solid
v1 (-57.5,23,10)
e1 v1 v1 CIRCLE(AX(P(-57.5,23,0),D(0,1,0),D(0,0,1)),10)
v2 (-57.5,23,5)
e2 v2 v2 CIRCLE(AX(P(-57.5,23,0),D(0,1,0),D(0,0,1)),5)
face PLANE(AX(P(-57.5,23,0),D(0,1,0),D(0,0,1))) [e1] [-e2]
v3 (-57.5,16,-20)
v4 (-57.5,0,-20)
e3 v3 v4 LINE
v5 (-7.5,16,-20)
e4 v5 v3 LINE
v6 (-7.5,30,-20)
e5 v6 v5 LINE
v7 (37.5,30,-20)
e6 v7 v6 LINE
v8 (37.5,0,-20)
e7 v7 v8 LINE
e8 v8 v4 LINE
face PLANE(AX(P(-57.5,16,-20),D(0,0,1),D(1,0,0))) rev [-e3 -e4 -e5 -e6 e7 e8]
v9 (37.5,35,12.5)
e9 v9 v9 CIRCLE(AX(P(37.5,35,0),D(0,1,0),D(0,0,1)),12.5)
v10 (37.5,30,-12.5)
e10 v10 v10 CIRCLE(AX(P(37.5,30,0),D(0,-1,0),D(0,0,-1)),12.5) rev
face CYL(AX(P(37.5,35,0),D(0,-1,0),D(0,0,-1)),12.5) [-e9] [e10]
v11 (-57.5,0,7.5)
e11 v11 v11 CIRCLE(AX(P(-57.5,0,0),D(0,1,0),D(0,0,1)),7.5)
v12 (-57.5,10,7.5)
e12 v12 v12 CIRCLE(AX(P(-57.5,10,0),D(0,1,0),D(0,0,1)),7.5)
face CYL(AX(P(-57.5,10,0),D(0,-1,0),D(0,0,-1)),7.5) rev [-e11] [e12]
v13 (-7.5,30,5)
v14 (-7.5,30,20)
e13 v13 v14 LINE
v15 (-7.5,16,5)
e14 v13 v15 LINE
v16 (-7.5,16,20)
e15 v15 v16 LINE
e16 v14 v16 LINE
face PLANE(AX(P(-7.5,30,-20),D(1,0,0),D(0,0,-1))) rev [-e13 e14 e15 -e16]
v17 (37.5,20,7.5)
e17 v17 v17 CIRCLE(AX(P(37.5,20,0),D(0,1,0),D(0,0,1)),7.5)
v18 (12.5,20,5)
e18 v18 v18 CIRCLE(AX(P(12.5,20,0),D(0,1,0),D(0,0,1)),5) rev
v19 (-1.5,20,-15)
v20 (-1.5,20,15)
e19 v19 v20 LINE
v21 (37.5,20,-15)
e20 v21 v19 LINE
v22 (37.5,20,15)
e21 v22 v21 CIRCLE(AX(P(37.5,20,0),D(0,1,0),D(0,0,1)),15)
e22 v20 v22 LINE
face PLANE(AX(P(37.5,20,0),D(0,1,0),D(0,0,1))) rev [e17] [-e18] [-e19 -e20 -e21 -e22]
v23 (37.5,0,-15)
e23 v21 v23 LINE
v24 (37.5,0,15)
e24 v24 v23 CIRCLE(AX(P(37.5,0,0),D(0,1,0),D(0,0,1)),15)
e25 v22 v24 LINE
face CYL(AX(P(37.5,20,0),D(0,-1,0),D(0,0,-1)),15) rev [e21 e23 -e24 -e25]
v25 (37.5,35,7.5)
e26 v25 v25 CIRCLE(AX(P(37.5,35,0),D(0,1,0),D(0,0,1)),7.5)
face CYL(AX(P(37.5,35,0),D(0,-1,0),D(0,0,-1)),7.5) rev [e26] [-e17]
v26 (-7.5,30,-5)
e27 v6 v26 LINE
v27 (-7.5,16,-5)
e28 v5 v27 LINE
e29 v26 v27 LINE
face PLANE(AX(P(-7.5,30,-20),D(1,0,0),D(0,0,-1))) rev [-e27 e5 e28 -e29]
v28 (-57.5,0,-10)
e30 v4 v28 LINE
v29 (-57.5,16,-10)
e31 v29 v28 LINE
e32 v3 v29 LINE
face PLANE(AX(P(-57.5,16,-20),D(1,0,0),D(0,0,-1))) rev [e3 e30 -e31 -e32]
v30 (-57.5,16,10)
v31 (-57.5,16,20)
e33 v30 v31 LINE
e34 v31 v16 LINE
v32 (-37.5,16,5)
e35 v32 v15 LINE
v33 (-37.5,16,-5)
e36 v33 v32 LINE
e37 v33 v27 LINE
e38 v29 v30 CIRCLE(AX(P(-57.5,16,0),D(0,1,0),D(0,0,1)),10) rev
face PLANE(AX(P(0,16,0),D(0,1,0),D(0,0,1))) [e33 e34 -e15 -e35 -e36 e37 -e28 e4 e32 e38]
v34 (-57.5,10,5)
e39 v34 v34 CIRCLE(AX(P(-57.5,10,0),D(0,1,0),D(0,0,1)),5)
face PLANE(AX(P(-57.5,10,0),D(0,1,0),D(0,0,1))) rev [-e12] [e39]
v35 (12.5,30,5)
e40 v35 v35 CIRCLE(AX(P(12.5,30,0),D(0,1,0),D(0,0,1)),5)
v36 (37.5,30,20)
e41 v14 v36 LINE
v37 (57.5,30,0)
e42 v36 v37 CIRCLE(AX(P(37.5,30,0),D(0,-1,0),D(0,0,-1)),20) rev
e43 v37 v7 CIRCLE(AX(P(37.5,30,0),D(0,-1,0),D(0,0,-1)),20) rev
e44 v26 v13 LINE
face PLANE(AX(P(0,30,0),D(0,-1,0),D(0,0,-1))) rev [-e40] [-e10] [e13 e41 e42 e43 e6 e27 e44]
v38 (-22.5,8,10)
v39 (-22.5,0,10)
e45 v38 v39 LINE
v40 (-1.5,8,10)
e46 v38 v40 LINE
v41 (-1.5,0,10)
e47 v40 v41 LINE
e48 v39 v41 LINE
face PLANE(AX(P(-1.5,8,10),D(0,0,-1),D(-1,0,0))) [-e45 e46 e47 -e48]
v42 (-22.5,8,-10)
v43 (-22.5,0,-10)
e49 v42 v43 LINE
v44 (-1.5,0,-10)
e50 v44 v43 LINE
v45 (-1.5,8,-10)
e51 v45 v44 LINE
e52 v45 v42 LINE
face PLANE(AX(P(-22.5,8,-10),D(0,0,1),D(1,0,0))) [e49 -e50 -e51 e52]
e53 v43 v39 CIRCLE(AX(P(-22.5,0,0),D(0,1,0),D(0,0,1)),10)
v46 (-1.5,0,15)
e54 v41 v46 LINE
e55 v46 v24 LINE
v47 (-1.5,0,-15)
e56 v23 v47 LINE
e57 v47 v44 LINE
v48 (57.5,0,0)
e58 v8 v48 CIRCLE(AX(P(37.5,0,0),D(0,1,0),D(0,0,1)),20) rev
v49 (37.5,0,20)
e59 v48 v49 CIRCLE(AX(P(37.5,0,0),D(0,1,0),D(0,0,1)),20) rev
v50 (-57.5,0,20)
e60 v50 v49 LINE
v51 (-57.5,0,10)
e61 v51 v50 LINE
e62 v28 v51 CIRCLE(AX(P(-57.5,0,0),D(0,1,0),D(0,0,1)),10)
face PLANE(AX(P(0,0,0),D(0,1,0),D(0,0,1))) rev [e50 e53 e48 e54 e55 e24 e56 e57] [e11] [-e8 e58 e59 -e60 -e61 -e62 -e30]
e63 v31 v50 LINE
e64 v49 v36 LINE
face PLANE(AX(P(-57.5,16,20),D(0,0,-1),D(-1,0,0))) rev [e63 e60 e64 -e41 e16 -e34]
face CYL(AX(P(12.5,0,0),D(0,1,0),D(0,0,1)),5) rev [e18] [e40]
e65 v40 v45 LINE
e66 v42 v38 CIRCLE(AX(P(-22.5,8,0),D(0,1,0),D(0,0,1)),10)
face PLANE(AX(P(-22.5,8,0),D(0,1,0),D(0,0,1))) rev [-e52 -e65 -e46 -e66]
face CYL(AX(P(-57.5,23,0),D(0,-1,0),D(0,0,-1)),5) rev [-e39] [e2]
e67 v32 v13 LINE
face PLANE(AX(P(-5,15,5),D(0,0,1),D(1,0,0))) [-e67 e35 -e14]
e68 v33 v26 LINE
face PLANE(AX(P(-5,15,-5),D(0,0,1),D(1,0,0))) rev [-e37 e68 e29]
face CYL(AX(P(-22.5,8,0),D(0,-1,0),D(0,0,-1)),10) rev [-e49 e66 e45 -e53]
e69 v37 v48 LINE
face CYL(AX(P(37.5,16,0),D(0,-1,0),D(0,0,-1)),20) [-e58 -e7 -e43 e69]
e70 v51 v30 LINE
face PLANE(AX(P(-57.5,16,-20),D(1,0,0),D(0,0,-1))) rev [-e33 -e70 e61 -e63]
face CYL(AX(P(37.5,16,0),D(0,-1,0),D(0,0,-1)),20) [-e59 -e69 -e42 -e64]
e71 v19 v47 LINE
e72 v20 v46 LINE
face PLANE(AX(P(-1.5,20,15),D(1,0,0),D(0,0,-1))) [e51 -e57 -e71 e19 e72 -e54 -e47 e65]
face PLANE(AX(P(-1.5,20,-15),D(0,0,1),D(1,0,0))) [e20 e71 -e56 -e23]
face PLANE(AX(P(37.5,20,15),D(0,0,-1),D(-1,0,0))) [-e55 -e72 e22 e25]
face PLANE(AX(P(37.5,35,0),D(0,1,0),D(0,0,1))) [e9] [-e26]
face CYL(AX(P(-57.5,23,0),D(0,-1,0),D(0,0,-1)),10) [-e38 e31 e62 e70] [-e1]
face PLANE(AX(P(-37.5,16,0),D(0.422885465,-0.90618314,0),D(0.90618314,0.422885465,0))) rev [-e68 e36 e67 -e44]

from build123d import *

# Parameters (mm, degrees)
SKETCH1_W               = 115
SKETCH1_H               = 40
BOSS_EXTRUDE1_DEPTH     = 16
SKETCH2_R               = 10
SKETCH2_R_2             = 5
BOSS_EXTRUDE2_DEPTH     = 23
SKETCH3_R               = 7.5
CUT_EXTRUDE1_DEPTH      = 10
CUT_EXTRUDE2_DEPTH      = 36
CUT_EXTRUDE2_DEPTH_BACK = 24
SKETCH4_R               = 5
SKETCH5_W               = 65
SKETCH5_H               = 40
BOSS_EXTRUDE3_DEPTH     = 14
RIB2_REACH              = 78.526
SKETCH8_WALL_W          = 188.158169364
SKETCH8_WALL_H          = 10
FILLET3_R               = 20
SKETCH10_R              = 12.5
SKETCH10_R_2            = 7.5
BOSS_EXTRUDE4_DEPTH     = 5
SKETCH11_R              = 7.5
CUT_EXTRUDE3_DEPTH      = 77.526139325
SKETCH12_R              = 5
CUT_EXTRUDE4_DEPTH      = 77.526139325
CUT_EXTRUDE5_DEPTH      = 20
CUT_EXTRUDE6_DEPTH      = 8


with BuildPart() as part:
    # Sketch1 → Boss-Extrude1 (new body)
    with BuildSketch(Plane(origin=(0, 0, 0), x_dir=(1, 0, 0), z_dir=(0, 1, 0))):
        Rectangle(SKETCH1_W, SKETCH1_H)
    extrude(amount=BOSS_EXTRUDE1_DEPTH)

    # Sketch2 → Boss-Extrude2 (add)
    with BuildSketch(Plane(origin=(0, 0, 0), x_dir=(1, 0, 0), z_dir=(0, 1, 0))):
        with Locations(Location((-57.5, 0, 0), (0, 0, 270))):
            Circle(SKETCH2_R)
        with Locations(Location((-57.5, 0, 0), (0, 0, 270))):
            Circle(SKETCH2_R_2, mode=Mode.SUBTRACT)
    extrude(amount=BOSS_EXTRUDE2_DEPTH)

    # Sketch3 → Cut-Extrude1 (cut)
    with BuildSketch(Plane(origin=(0, 0, 0), x_dir=(1, 0, 0), z_dir=(0, 1, 0))):
        with Locations(Location((-57.5, 0, 0), (0, 0, 270))):
            Circle(SKETCH3_R)
    extrude(amount=CUT_EXTRUDE1_DEPTH, mode=Mode.SUBTRACT)

    # Sketch4 → Cut-Extrude2 (cut, two sides: drawn at the far end of the back side and taken through both)
    with BuildSketch(Plane(origin=(0, 0, 0), x_dir=(1, 0, 0), z_dir=(0, 1, 0)).offset(-CUT_EXTRUDE2_DEPTH_BACK)):
        with Locations(Location((-57.5, 0, 0), (0, 0, 270))):
            Circle(SKETCH4_R)
    extrude(amount=CUT_EXTRUDE2_DEPTH + CUT_EXTRUDE2_DEPTH_BACK, mode=Mode.SUBTRACT)

    # Sketch5 → Boss-Extrude3 (add)
    with BuildSketch(Plane(origin=(0, 16, 0), x_dir=(1, 0, 0), z_dir=(0, 1, 0))):
        with Locations((25, 0)):
            Rectangle(SKETCH5_W, SKETCH5_H)
    extrude(amount=BOSS_EXTRUDE3_DEPTH)

    # Sketch8 wall → Rib2 (add, up to next)
    with BuildSketch(Plane(origin=(-22.5, 23, 0), x_dir=(0.906183139995, 0.422885465331, 0), z_dir=(-0.422885465331, 0.906183139995, 0)), mode=Mode.PRIVATE) as rib2_sk1:
        Rectangle(SKETCH8_WALL_W, SKETCH8_WALL_H)
    rib2_tool1 = extrude(rib2_sk1.sketch, amount=-RIB2_REACH, mode=Mode.PRIVATE) - part.part
    add(rib2_tool1.solids().sort_by_distance((-22.5, 23, 0))[0])

    # Fillet3
    fillet3_edges = [part.edges().sort_by_distance(p)[0] for p in [
        (57.5, 15, -20),
        (57.5, 15, 20),
    ]]
    fillet(fillet3_edges, radius=FILLET3_R - 0.0001)  # a hair under: the kernel refuses the full size

    # Sketch10 → Boss-Extrude4 (add)
    with BuildSketch(Plane(origin=(0, 30, 0), x_dir=(1, 0, 0), z_dir=(0, 1, 0))):
        with Locations(Location((37.5, 0, 0), (0, 0, 90))):
            Circle(SKETCH10_R)
        with Locations(Location((37.5, 0, 0), (0, 0, 270))):
            Circle(SKETCH10_R_2, mode=Mode.SUBTRACT)
    extrude(amount=BOSS_EXTRUDE4_DEPTH)

    # Sketch11 → Cut-Extrude3 (cut, through all)
    with BuildSketch(Plane(origin=(0, 30, 0), x_dir=(1, 0, 0), z_dir=(0, 1, 0))):
        with Locations(Location((37.5, 0, 0), (0, 0, 270))):
            Circle(SKETCH11_R)
    extrude(amount=-CUT_EXTRUDE3_DEPTH, mode=Mode.SUBTRACT)

    # Sketch12 → Cut-Extrude4 (cut, through all)
    with BuildSketch(Plane(origin=(0, 30, 0), x_dir=(1, 0, 0), z_dir=(0, 1, 0))):
        with Locations(Location((12.5, 0, 0), (0, 0, 270))):
            Circle(SKETCH12_R)
    extrude(amount=-CUT_EXTRUDE4_DEPTH, mode=Mode.SUBTRACT)

    # Sketch13 → Cut-Extrude5 (cut)
    with BuildSketch(Plane(origin=(0, 0, 0), x_dir=(1, 0, 0), z_dir=(0, 1, 0))):
        with BuildLine():
            Line((37.5, -15), (-1.5, -15))
            Line((-1.5, -15), (-1.5, 15))
            Line((-1.5, 15), (37.5, 15))
            ThreePointArc((37.5, 15), (52.5, 0), (37.5, -15))
        make_face()
    extrude(amount=CUT_EXTRUDE5_DEPTH, mode=Mode.SUBTRACT)

    # Sketch14 → Cut-Extrude6 (cut)
    with BuildSketch(Plane(origin=(0, 0, 0), x_dir=(1, 0, 0), z_dir=(0, 1, 0))):
        with BuildLine():
            Line((-22.5, 10), (-1.5, 10))
            Line((-1.5, 10), (-1.5, -10))
            Line((-1.5, -10), (-22.5, -10))
            ThreePointArc((-22.5, -10), (-32.5, 0), (-22.5, 10))
        make_face()
    extrude(amount=CUT_EXTRUDE6_DEPTH, mode=Mode.SUBTRACT)


solid = part.part
